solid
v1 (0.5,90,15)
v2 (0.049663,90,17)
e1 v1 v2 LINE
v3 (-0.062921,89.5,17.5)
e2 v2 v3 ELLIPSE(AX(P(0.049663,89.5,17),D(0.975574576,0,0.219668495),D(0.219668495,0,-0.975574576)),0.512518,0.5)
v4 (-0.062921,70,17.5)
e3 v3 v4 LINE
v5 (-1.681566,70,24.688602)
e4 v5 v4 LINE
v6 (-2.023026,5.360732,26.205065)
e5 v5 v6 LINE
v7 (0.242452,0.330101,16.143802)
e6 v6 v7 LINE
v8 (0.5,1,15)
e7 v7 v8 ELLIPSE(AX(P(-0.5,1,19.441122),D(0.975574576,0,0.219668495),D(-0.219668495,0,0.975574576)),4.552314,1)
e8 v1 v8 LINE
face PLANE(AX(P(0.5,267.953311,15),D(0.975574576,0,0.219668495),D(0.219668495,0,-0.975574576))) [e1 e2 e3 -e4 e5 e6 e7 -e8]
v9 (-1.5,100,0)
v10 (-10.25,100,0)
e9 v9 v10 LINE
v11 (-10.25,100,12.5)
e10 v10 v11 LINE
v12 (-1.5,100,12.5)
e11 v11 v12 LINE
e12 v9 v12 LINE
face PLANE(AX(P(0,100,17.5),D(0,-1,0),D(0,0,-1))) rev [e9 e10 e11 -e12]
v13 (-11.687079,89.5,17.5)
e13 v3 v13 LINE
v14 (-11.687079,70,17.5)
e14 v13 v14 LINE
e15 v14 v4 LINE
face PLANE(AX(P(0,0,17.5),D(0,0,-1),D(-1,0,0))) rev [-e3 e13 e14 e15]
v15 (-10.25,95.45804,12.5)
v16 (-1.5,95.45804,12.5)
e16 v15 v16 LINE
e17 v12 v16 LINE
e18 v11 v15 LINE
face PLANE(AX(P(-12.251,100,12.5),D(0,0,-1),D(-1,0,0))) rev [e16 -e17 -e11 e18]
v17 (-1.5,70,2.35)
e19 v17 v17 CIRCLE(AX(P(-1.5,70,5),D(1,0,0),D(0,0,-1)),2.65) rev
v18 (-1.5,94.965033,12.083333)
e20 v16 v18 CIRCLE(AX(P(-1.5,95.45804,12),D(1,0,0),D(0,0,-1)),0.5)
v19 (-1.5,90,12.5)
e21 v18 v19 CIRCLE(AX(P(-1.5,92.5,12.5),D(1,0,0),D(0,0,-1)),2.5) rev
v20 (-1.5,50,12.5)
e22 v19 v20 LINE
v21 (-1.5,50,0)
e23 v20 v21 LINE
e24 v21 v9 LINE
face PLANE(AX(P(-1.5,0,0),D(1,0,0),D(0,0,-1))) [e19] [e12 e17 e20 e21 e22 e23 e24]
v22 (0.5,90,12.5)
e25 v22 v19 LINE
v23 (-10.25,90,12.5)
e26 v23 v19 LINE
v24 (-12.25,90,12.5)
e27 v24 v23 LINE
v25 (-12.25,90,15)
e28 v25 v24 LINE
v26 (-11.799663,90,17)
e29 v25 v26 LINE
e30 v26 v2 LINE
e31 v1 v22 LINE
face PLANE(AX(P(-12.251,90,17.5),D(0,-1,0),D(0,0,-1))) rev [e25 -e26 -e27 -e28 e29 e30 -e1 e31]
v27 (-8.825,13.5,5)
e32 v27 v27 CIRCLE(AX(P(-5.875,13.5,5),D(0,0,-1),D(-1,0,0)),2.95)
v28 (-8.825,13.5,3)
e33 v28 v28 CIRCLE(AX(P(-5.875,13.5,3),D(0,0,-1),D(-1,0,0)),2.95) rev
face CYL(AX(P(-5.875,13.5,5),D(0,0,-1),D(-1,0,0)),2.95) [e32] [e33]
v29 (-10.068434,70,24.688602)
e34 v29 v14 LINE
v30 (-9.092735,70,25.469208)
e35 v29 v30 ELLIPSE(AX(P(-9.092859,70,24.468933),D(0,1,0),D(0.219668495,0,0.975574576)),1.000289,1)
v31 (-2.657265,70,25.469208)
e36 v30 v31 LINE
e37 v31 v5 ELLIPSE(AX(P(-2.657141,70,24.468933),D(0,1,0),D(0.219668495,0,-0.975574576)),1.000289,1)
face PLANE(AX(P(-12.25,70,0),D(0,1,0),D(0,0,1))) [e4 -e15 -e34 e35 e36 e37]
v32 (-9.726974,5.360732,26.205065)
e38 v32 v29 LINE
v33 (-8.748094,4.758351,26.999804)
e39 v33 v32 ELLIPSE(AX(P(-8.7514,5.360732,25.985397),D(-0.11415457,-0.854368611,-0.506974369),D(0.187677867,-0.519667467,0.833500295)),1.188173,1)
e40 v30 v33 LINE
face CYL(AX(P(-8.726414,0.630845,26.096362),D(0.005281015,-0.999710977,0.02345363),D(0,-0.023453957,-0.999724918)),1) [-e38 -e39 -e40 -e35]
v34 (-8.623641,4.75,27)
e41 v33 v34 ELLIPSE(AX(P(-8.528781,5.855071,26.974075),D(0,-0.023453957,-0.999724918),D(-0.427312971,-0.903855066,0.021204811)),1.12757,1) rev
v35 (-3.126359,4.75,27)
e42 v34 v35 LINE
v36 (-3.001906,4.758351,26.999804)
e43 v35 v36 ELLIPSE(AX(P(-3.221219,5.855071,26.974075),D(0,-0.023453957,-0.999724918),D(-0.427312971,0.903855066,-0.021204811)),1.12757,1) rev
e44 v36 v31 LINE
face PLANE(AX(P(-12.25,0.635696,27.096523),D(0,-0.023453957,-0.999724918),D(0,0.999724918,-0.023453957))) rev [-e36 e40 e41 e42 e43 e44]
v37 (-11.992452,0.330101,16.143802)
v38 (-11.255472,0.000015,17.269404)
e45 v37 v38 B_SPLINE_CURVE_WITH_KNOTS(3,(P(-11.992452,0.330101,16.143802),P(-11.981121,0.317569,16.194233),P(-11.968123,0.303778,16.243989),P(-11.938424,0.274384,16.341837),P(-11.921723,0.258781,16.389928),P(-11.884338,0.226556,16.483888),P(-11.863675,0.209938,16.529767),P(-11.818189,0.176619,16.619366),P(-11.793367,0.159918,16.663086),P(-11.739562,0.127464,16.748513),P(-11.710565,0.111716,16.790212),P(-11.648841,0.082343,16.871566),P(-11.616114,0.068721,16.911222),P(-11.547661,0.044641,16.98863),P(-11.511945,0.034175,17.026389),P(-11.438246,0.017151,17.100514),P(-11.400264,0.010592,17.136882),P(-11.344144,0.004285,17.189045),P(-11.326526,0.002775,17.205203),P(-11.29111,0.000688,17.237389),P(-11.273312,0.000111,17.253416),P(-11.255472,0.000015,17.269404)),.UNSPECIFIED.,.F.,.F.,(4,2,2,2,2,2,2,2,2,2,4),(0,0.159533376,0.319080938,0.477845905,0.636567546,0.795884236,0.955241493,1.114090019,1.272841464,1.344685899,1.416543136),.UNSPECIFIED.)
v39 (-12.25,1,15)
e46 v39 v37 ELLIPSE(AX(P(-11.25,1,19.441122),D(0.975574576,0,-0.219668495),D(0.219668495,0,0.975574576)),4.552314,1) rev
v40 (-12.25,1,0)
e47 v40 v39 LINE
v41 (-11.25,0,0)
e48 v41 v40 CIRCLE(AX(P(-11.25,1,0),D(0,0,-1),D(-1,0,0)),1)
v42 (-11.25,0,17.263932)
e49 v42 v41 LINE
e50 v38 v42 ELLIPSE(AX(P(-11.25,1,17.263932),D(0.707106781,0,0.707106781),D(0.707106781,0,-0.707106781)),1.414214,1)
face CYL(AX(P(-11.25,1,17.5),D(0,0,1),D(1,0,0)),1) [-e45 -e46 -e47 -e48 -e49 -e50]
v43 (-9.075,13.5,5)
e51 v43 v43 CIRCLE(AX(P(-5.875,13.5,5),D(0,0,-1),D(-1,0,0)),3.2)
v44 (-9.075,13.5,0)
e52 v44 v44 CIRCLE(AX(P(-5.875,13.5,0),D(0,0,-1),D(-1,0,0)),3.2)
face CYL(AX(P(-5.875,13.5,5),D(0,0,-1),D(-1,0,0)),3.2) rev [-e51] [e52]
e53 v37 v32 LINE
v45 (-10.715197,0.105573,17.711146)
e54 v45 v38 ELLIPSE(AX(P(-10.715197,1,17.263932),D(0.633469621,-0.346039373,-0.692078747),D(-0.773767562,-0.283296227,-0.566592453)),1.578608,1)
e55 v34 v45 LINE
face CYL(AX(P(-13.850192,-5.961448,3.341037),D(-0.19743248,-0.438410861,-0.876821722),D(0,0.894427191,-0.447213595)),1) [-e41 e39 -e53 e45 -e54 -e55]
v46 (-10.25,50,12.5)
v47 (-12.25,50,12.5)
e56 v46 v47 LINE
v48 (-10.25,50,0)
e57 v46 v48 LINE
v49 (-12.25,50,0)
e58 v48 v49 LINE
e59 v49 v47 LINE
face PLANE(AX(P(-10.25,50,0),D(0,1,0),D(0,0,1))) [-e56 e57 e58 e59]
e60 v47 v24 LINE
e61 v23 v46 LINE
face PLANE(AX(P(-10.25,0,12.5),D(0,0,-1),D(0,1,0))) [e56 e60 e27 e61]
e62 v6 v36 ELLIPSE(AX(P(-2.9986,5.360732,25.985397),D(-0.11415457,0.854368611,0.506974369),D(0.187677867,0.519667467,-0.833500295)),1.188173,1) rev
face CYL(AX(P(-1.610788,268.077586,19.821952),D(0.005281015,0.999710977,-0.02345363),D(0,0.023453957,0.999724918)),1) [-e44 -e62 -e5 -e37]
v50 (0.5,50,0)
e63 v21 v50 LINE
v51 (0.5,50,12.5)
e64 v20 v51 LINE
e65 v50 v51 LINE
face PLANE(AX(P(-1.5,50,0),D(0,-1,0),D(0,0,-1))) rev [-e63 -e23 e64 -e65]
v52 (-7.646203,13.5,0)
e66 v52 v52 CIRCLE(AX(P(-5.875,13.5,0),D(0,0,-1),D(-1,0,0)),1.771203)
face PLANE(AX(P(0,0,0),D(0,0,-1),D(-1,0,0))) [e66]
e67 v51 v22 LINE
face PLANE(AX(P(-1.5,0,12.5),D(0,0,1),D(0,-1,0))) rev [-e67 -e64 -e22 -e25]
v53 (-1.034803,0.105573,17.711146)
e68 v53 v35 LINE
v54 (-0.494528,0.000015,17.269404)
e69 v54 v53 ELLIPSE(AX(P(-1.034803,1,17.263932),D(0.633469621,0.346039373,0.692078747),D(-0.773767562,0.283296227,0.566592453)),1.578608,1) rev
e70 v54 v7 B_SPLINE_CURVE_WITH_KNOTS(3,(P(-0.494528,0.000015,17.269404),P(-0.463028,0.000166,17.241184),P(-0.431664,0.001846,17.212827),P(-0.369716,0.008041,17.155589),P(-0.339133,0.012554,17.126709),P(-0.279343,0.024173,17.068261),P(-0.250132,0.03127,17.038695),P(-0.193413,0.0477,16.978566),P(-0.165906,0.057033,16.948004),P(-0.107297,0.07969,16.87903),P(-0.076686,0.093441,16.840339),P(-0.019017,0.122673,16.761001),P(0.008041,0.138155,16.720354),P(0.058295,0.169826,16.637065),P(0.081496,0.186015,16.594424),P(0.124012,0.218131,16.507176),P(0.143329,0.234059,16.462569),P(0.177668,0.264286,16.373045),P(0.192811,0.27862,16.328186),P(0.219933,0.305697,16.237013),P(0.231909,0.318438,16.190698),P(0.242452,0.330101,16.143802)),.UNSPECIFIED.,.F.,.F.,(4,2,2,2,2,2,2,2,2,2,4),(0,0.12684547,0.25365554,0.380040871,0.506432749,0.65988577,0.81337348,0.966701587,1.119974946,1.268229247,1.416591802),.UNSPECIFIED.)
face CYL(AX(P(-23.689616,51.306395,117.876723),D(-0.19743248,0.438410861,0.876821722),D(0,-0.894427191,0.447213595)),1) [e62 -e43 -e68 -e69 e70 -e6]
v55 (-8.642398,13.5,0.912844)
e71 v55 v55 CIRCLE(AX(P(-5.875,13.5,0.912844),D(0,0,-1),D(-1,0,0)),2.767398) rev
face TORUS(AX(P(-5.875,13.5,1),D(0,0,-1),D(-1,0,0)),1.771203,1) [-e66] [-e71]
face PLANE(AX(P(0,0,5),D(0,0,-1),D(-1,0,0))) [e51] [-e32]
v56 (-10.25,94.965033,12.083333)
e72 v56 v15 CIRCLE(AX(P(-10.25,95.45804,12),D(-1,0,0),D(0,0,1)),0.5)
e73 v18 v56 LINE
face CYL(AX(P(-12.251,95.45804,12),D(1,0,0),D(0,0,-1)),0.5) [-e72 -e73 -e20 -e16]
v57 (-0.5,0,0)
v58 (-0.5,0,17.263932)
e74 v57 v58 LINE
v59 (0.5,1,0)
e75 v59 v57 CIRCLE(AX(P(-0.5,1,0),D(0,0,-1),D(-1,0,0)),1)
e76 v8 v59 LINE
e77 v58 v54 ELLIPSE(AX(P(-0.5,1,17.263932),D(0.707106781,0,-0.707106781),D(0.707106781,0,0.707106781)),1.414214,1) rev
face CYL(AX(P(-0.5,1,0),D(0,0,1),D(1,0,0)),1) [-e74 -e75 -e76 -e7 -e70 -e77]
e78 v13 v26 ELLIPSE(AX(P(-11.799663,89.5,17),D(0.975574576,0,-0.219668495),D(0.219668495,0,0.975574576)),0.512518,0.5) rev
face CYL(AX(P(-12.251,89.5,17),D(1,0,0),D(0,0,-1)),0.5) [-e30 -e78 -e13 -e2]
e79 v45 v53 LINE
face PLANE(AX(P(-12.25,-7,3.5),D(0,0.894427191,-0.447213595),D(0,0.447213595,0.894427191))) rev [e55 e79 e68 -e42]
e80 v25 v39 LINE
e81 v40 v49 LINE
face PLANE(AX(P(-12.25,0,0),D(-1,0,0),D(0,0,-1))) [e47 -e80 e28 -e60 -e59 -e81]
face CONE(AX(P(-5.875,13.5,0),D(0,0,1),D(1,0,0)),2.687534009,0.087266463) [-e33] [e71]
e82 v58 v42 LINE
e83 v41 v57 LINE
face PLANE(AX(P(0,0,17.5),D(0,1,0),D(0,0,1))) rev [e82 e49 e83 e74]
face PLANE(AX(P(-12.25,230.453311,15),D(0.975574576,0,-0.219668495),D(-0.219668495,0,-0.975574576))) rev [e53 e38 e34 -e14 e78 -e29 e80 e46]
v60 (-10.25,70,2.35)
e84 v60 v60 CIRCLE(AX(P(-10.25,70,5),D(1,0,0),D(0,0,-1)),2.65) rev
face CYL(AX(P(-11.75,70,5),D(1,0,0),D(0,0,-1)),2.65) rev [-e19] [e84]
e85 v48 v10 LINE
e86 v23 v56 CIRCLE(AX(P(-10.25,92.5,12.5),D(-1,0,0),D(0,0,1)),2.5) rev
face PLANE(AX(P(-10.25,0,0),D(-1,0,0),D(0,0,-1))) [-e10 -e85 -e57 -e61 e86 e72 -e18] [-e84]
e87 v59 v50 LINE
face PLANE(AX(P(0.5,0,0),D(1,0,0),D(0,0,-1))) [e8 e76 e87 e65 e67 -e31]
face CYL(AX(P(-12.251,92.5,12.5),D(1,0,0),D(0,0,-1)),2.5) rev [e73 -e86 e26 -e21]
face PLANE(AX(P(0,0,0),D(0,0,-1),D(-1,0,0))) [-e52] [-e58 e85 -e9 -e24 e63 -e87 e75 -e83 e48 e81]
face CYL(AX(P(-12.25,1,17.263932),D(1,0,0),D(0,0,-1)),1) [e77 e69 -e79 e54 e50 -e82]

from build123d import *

# Parameters (mm, degrees)
SKETCH1_W           = 100
SKETCH1_H           = 11.75
BOSS_EXTRUDE1_DEPTH = 17.5
SKETCH5_R           = 2.65
CUT_EXTRUDE2_DEPTH  = 103.197419243
SKETCH4_W           = 50
SKETCH4_H           = 12.5
SKETCH4_R           = 2.65
CUT_EXTRUDE3_DEPTH  = 1.5
BOSS_EXTRUDE3_DEPTH = 0.5
BOSS_EXTRUDE2_DEPTH = 12.75
CUT_EXTRUDE4_DEPTH  = 105.302744451
FILLET4_R           = 1
FILLET3_R           = 1
CUT_EXTRUDE5_REACH  = 100.641
CUT_EXTRUDE7_REACH  = 106.363
SKETCH13_W          = 5
SKETCH13_H          = 5
FILLET5_R           = 0.5
CUT_EXTRUDE6_DEPTH  = 5
CHAMFER1_SIZE       = 3
CHAMFER1_SIZE2      = 0.262465991
FILLET6_R           = 1


with BuildPart() as part:
    # Sketch1 → Boss-Extrude1 (new body)
    with BuildSketch(Plane(origin=(0, 0, 0), x_dir=(0, 1, 0), z_dir=(0, 0, 1))):
        with Locations((50, 5.875)):
            Rectangle(SKETCH1_W, SKETCH1_H)
    extrude(amount=BOSS_EXTRUDE1_DEPTH)

    # Sketch5 → Cut-Extrude2 (cut, through all)
    with BuildSketch(Plane.YZ):
        with Locations(Location((70, 5, 0), (0, 0, 270))):
            Circle(SKETCH5_R)
    extrude(amount=-CUT_EXTRUDE2_DEPTH, mode=Mode.SUBTRACT)

    # Sketch4 → Cut-Extrude3 (cut)
    with BuildSketch(Plane.YZ):
        with Locations((75, 6.25)):
            Rectangle(SKETCH4_W, SKETCH4_H)
        with Locations(Location((70, 5, 0), (0, 0, 270))):
            Circle(SKETCH4_R, mode=Mode.SUBTRACT)
    cut_extrude3 = extrude(amount=-CUT_EXTRUDE3_DEPTH, mode=Mode.SUBTRACT)

    # Mirror1: Cut-Extrude3 across plane
    add(cut_extrude3.mirror(Plane(origin=(-5.875, 0, 0), x_dir=(0, 0, 1), z_dir=(1, 0, 0))), mode=Mode.SUBTRACT)

    # Sketch9 → Boss-Extrude3 (add)
    with BuildSketch(Plane.YZ):
        Polygon((0, 17.5), (50, 17.5), (100, 17.5), (100, 12.5), (50, 12.5), (50, 0), (0, 0), align=None)
    boss_extrude3 = extrude(amount=BOSS_EXTRUDE3_DEPTH)

    # Mirror4: Boss-Extrude3 across plane
    add(boss_extrude3.mirror(Plane(origin=(-5.875, 0, 0), x_dir=(0, 0, 1), z_dir=(1, 0, 0))))

    # Sketch6 → Boss-Extrude2 (add)
    with BuildSketch(Plane.YZ.offset(0.5)):
        Polygon((4.75, 27), (0, 17.5), (70, 17.5), (70, 25.469208211), align=None)
    extrude(amount=-BOSS_EXTRUDE2_DEPTH)

    # Sketch7 → Cut-Extrude4 (cut, symmetric)
    with BuildSketch(Plane(origin=(0, 100, 0), x_dir=(-1, 0, 0), z_dir=(0, 1, 0))):
        Polygon((-15.35357036, -50.966517558), (-0.5, 15), (2.202019917, 27), (17.055590277, 92.966517558), (-114.877444838, 122.673658277), (-147.286605475, -21.259376838), align=None)
    cut_extrude4 = extrude(amount=CUT_EXTRUDE4_DEPTH, both=True, mode=Mode.SUBTRACT)

    # Mirror3: Cut-Extrude4 across plane
    add(cut_extrude4.mirror(Plane(origin=(-5.875, 0, 0), x_dir=(0, 0, 1), z_dir=(1, 0, 0))), mode=Mode.SUBTRACT)

    # Fillet4
    fillet4_edges = [part.edges().sort_by_distance(p)[0] for p in [
        (-2.029677005, 37.375, 26.234604106),
        (-1.132470367, 2.375, 22.25),
        (-5.875, 0, 17.5),
        (-9.720322995, 37.375, 26.234604106),
        (-10.617529633, 2.375, 22.25),
    ]]
    fillet(fillet4_edges, radius=FILLET4_R)

    # Fillet3
    # the kernel refuses this fillet: 1 mm, written as the material it takes off along each edge
    with BuildSketch(Plane(origin=(-12.25, 0, -2.5), x_dir=(1, 0, 0), z_dir=(0, 0, 1))) as fillet3_piece_1:
        with BuildLine():
            CenterArc((FILLET3_R, FILLET3_R), FILLET3_R, 180, 90)
            Line((0, FILLET3_R), (0, 0))
            Line((0, 0), (FILLET3_R, 0))
        make_face()
    extrude(amount=20, mode=Mode.SUBTRACT)
    with BuildSketch(Plane(origin=(0.5, 0, -2.5), x_dir=(-1, 0, 0), z_dir=(0, 0, 1))) as fillet3_piece_2:
        with BuildLine():
            CenterArc((FILLET3_R, -FILLET3_R), FILLET3_R, 90, 90)
            Line((0, -FILLET3_R), (0, 0))
            Line((0, 0), (FILLET3_R, 0))
        make_face()
    extrude(amount=20, mode=Mode.SUBTRACT)

    # Sketch11 → Cut-Extrude5 (cut, up to next)
    with BuildSketch(Plane(origin=(0.5, 95.880843205, 19.349640389), x_dir=(0, 0, 1), z_dir=(1, 0, 0)), mode=Mode.PRIVATE) as cut_extrude5_sk1:
        with BuildLine():
            Line((-6.849640389, 0.880843205), (-1.849640389, 0.880843205))
            ThreePointArc((-1.849640389, 0.880843205), (0.650359611, 3.380843205), (-1.849640389, 5.880843205))
            Line((-1.849640389, 5.880843205), (-6.849640389, 5.880843205))
            ThreePointArc((-6.849640389, 5.880843205), (-9.349640389, 3.380843205), (-6.849640389, 0.880843205))
        make_face()
    cut_extrude5_tool1 = extrude(cut_extrude5_sk1.sketch, amount=-CUT_EXTRUDE5_REACH, mode=Mode.PRIVATE) & part.part
    add(cut_extrude5_tool1.solids().sort_by_distance((0.5, 92.5, 15))[0], mode=Mode.SUBTRACT)

    # Sketch13 → Cut-Extrude7 (cut, up to next)
    with BuildSketch(Plane.YZ.offset(0.5), mode=Mode.PRIVATE) as cut_extrude7_sk1:
        with Locations((97.5, 15)):
            Rectangle(SKETCH13_W, SKETCH13_H)
    cut_extrude7_tool1 = extrude(cut_extrude7_sk1.sketch, amount=-CUT_EXTRUDE7_REACH, mode=Mode.PRIVATE) & part.part
    add(cut_extrude7_tool1.solids().sort_by_distance((0.5, 97.5, 15))[0], mode=Mode.SUBTRACT)

    # Fillet5
    fillet5_edges = [part.edges().sort_by_distance(p)[0] for p in [
        (-5.875, 95, 12.5),
        (-5.875, 90, 17.5),
    ]]
    fillet(fillet5_edges, radius=FILLET5_R)

    # Sketch12 → Cut-Extrude6 (cut)
    with BuildSketch(Plane(origin=(0, 0, 0), x_dir=(1, 0, 0), z_dir=(0, 0, -1))):
        with BuildLine():
            ThreePointArc((-2.675, -13.5), (-3.6122583, -11.2372583), (-5.875, -10.3))
            Line((-5.875, -10.3), (-5.875, -10.55))
            ThreePointArc((-5.875, -10.55), (-3.789034995, -11.414034995), (-2.925, -13.5))
            Line((-2.925, -13.5), (-2.675, -13.5))
        make_face()
        with BuildLine():
            Line((-5.875, -10.55), (-5.875, -10.3))
            ThreePointArc((-5.875, -10.3), (-8.1377417, -15.7627417), (-2.675, -13.5))
            Line((-2.675, -13.5), (-2.925, -13.5))
            ThreePointArc((-2.925, -13.5), (-7.960965005, -15.585965005), (-5.875, -10.55))
        make_face()
    extrude(amount=-CUT_EXTRUDE6_DEPTH, mode=Mode.SUBTRACT)

    # Chamfer1
    chamfer1_edges = [part.edges().sort_by_distance(p)[0] for p in [
        (-5.875, 16.45, 0),
    ]]
    chamfer1_side = [part.faces().sort_by_distance(p)[0] for p in [
        (-5.875, 16.45, 2.5),
    ]]
    chamfer(chamfer1_edges, length=CHAMFER1_SIZE, length2=CHAMFER1_SIZE2, reference=chamfer1_side[0])

    # Fillet6
    fillet6_edges = [part.edges().sort_by_distance(p)[0] for p in [
        (-5.875, 16.187534009, 0),
    ]]
    fillet(fillet6_edges, radius=FILLET6_R)


solid = part.part
